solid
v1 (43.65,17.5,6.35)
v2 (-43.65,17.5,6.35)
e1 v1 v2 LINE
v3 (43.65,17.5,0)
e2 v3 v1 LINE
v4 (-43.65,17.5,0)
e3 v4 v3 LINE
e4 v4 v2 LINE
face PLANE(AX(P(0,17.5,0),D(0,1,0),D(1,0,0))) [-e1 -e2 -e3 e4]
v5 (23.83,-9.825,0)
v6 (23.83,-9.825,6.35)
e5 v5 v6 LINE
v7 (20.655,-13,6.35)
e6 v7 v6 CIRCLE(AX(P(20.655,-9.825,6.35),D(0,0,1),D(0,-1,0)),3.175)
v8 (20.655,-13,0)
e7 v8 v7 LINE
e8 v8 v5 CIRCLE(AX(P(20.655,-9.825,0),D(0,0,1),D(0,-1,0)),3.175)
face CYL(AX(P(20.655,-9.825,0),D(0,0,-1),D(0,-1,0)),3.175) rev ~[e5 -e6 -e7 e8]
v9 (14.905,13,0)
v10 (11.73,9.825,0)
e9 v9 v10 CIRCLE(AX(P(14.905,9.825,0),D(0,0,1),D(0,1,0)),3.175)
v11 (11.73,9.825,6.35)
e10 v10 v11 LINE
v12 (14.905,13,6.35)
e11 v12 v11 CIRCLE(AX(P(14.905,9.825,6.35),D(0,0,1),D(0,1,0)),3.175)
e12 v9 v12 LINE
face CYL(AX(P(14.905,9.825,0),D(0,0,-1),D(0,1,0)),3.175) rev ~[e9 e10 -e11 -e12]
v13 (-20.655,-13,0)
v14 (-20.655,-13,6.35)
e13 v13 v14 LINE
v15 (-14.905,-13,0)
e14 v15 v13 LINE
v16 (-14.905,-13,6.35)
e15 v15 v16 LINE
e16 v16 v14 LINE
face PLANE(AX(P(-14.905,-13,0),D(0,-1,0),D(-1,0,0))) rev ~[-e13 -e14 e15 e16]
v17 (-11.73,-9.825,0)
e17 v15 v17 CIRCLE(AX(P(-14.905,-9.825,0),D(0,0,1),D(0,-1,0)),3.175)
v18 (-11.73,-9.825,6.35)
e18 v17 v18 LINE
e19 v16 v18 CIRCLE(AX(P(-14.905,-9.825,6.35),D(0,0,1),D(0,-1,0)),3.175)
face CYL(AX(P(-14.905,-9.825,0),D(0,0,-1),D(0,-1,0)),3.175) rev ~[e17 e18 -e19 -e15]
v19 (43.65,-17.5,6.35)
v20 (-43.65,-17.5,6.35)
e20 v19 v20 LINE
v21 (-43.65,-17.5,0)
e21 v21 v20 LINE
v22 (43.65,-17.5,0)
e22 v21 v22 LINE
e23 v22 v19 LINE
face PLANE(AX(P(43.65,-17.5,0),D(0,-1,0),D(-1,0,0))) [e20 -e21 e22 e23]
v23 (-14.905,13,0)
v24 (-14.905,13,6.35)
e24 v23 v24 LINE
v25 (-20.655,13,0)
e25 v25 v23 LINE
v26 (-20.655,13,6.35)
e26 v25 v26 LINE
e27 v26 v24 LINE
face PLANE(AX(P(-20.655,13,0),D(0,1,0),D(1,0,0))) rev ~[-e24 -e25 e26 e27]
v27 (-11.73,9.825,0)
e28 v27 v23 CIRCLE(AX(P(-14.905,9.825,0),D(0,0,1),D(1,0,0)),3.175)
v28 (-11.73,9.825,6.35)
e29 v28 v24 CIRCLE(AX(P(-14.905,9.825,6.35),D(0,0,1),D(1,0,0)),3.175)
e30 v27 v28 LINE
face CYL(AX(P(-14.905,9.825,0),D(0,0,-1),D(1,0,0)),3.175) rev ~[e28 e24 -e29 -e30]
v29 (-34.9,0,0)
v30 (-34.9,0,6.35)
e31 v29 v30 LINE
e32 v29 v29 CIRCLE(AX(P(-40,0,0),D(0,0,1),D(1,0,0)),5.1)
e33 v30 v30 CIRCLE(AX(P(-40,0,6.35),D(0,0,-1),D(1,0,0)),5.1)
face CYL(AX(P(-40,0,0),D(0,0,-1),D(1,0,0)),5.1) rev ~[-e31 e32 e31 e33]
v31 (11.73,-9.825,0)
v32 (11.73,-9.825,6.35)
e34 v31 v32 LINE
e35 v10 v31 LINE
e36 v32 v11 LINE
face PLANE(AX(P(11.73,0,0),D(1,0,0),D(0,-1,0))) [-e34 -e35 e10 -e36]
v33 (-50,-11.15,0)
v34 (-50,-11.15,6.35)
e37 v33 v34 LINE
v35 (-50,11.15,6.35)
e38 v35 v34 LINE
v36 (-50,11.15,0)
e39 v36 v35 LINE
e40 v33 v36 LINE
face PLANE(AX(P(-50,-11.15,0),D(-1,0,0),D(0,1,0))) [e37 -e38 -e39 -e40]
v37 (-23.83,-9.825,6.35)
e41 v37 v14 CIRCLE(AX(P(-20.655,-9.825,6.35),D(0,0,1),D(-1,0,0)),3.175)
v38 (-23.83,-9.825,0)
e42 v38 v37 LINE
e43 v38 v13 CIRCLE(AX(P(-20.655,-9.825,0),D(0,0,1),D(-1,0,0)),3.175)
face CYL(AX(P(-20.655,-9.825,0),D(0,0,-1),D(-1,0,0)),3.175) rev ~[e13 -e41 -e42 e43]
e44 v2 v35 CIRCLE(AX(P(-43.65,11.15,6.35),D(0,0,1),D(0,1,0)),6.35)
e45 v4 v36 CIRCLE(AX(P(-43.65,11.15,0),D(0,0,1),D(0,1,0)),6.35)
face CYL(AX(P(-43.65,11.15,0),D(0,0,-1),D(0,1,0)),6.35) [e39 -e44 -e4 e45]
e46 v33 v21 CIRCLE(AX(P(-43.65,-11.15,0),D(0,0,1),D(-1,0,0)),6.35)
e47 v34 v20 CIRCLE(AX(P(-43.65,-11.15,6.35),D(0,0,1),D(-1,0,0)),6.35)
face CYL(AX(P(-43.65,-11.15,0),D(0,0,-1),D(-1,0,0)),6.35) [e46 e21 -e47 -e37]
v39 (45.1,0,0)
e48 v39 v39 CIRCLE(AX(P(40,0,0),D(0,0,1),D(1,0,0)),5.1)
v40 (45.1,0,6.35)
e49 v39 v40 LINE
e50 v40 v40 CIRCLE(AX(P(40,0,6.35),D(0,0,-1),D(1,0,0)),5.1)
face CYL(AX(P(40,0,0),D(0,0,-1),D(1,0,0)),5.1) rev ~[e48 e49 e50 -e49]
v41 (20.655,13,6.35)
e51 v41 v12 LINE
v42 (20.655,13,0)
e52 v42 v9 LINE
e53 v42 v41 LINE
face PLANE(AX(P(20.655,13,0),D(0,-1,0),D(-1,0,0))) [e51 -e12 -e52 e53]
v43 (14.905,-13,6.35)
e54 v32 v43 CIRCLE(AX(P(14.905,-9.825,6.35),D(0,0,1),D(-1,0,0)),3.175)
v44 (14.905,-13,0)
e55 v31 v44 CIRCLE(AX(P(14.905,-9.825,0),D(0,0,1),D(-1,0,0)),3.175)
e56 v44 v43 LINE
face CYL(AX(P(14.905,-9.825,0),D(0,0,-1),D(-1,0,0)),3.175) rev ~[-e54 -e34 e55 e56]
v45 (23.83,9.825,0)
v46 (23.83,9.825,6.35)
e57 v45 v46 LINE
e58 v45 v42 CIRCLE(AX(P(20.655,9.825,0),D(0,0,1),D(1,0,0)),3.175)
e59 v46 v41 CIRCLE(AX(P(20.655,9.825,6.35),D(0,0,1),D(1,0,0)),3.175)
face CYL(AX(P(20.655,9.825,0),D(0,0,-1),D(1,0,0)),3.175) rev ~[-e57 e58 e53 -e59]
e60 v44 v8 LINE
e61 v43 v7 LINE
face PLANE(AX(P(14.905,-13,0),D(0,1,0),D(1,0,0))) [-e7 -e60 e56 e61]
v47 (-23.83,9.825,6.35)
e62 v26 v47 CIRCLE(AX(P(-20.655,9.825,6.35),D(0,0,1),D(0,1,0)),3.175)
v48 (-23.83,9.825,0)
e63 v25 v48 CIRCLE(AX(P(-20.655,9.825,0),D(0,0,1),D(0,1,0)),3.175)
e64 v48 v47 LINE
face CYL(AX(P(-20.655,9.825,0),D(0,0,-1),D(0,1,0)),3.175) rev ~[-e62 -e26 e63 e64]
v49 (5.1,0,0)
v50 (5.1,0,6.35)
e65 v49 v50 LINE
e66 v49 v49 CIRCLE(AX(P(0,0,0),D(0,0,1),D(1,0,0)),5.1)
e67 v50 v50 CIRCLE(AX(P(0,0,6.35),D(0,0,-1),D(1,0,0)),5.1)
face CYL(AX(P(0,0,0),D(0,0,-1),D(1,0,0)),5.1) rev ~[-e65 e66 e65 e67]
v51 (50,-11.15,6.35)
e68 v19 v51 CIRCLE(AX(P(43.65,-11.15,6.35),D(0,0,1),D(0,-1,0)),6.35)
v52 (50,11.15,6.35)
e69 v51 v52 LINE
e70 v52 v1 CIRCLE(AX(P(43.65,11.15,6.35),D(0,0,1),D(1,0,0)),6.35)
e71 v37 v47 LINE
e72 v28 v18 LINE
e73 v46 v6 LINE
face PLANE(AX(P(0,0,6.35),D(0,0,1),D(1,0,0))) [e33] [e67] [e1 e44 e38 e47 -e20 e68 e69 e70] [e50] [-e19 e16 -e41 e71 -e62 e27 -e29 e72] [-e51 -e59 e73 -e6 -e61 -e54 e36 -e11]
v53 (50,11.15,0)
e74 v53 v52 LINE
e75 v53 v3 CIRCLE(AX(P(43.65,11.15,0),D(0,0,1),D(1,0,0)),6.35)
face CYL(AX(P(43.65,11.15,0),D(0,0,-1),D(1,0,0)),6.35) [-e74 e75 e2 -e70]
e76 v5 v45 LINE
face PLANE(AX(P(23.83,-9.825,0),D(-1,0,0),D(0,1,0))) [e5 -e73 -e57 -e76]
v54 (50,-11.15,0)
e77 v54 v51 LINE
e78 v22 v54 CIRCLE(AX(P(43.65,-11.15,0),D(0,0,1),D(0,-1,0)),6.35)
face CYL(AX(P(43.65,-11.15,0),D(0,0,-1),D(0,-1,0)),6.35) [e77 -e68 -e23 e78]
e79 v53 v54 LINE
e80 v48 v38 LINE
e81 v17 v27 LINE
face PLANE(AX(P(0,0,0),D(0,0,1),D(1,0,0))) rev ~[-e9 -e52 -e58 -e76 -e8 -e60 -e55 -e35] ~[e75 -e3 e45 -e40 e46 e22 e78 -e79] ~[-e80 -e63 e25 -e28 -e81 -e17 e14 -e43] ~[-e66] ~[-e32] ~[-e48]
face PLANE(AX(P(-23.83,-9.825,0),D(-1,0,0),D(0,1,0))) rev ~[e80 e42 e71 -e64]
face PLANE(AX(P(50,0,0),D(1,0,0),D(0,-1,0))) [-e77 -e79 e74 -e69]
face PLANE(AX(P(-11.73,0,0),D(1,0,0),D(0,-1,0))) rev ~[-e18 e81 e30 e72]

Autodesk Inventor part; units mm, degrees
ref_plane "YZ Plane" through (0, 0, 0) normal (1, 0, 0) x (0, 1, 0)
ref_plane "XZ Plane" through (0, 0, 0) normal (0, 1, 0) x (-1, 0, 0)
ref_plane "XY Plane" through (0, 0, 0) normal (0, 0, 1) x (1, 0, 0)
sketch "Sketch1" plane through (0, 0, 0) normal (0, 0, 1) x (1, 0, 0)
  line L0 (43.65, -17.5) -> (-43.65, -17.5)
  line L1 (-50, -11.15) -> (-50, 11.15)
  line L2 (-43.65, 17.5) -> (43.65, 17.5)
  line L3 (50, 11.15) -> (50, -11.15)
  line L4 (50, -17.5) -> (-50, 17.5) construction
  line L5 (-50, -17.5) -> (50, 17.5) construction
  line L6 (0, 51.2558) -> (0, -45.9758)
  circle A0 centre (-40, 0) radius 5.1
  line L7 (-83.6339, 0) -> (65.0593, 0)
  circle A1 centre (40, 0) radius 5.1
  circle A2 centre (0, 0) radius 5.1
  arc A3 (-43.65, 17.5) -> (-50, 11.15) centre (-43.65, 11.15) ccw
  arc A4 (-50, -11.15) -> (-43.65, -17.5) centre (-43.65, -11.15) ccw
  arc A5 (43.65, -17.5) -> (50, -11.15) centre (43.65, -11.15) ccw
  arc A6 (50, 11.15) -> (43.65, 17.5) centre (43.65, 11.15) ccw
  line L8 (-14.905, -13) -> (-20.655, -13)
  line L9 (-23.83, -9.825) -> (-23.83, 9.825)
  line L10 (-20.655, 13) -> (-14.905, 13)
  line L11 (-11.73, 9.825) -> (-11.73, -9.825)
  line L12 (-11.73, -13) -> (-23.83, 13) construction
  line L13 (-23.83, -13) -> (-11.73, 13) construction
  line L14 (14.905, -13) -> (20.655, -13)
  line L15 (23.83, -9.825) -> (23.83, 9.825)
  line L16 (20.655, 13) -> (14.905, 13)
  line L17 (11.73, 9.825) -> (11.73, -9.825)
  line L18 (11.73, -13) -> (23.83, 13) construction
  line L19 (23.83, -13) -> (11.73, 13) construction
  arc A7 (-20.655, 13) -> (-23.83, 9.825) centre (-20.655, 9.825) ccw
  arc A8 (-11.73, 9.825) -> (-14.905, 13) centre (-14.905, 9.825) ccw
  arc A9 (-14.905, -13) -> (-11.73, -9.825) centre (-14.905, -9.825) ccw
  arc A10 (-23.83, -9.825) -> (-20.655, -13) centre (-20.655, -9.825) ccw
  arc A11 (11.73, -9.825) -> (14.905, -13) centre (14.905, -9.825) ccw
  arc A12 (20.655, -13) -> (23.83, -9.825) centre (20.655, -9.825) ccw
  arc A13 (23.83, 9.825) -> (20.655, 13) centre (20.655, 9.825) ccw
  arc A14 (14.905, 13) -> (11.73, 9.825) centre (14.905, 9.825) ccw
  point P0 (0, 0)
  point P1 (0, 0)
  point P2 (-17.78, 0)
  point P3 (17.78, 0)
  dimension "d0" = 100
  dimension "d1" = 35
  dimension "d2" = 80
  dimension "d3" = 10.2
  dimension "d6" = 10.2
  dimension "d7" = 6.35
  dimension "d8" = 26
  dimension "d9" = 12.1
  dimension "d10" = 3.175
  dimension "d11" = 35.56
extrude "Extrusion1" add sketch "Sketch1" along normal blind 6.35 contours L0 L6 A2 L7 L17 A11 L14 A12 L15 A1 L3 A5 | L0 A4 L1 L7 A0 L9 A10 L8 A9 L11 A2 L6 | L7 A1 L15 A13 L16 A14 L17 A2 L6 L2 A6 L3 | L7 L11 A8 L10 A7 L9 A0 L1 A3 L2 L6 A2
equation "\"d6\" = d3"
properties part number "Vertical_Lead_Screw_E-stop_Plate"
